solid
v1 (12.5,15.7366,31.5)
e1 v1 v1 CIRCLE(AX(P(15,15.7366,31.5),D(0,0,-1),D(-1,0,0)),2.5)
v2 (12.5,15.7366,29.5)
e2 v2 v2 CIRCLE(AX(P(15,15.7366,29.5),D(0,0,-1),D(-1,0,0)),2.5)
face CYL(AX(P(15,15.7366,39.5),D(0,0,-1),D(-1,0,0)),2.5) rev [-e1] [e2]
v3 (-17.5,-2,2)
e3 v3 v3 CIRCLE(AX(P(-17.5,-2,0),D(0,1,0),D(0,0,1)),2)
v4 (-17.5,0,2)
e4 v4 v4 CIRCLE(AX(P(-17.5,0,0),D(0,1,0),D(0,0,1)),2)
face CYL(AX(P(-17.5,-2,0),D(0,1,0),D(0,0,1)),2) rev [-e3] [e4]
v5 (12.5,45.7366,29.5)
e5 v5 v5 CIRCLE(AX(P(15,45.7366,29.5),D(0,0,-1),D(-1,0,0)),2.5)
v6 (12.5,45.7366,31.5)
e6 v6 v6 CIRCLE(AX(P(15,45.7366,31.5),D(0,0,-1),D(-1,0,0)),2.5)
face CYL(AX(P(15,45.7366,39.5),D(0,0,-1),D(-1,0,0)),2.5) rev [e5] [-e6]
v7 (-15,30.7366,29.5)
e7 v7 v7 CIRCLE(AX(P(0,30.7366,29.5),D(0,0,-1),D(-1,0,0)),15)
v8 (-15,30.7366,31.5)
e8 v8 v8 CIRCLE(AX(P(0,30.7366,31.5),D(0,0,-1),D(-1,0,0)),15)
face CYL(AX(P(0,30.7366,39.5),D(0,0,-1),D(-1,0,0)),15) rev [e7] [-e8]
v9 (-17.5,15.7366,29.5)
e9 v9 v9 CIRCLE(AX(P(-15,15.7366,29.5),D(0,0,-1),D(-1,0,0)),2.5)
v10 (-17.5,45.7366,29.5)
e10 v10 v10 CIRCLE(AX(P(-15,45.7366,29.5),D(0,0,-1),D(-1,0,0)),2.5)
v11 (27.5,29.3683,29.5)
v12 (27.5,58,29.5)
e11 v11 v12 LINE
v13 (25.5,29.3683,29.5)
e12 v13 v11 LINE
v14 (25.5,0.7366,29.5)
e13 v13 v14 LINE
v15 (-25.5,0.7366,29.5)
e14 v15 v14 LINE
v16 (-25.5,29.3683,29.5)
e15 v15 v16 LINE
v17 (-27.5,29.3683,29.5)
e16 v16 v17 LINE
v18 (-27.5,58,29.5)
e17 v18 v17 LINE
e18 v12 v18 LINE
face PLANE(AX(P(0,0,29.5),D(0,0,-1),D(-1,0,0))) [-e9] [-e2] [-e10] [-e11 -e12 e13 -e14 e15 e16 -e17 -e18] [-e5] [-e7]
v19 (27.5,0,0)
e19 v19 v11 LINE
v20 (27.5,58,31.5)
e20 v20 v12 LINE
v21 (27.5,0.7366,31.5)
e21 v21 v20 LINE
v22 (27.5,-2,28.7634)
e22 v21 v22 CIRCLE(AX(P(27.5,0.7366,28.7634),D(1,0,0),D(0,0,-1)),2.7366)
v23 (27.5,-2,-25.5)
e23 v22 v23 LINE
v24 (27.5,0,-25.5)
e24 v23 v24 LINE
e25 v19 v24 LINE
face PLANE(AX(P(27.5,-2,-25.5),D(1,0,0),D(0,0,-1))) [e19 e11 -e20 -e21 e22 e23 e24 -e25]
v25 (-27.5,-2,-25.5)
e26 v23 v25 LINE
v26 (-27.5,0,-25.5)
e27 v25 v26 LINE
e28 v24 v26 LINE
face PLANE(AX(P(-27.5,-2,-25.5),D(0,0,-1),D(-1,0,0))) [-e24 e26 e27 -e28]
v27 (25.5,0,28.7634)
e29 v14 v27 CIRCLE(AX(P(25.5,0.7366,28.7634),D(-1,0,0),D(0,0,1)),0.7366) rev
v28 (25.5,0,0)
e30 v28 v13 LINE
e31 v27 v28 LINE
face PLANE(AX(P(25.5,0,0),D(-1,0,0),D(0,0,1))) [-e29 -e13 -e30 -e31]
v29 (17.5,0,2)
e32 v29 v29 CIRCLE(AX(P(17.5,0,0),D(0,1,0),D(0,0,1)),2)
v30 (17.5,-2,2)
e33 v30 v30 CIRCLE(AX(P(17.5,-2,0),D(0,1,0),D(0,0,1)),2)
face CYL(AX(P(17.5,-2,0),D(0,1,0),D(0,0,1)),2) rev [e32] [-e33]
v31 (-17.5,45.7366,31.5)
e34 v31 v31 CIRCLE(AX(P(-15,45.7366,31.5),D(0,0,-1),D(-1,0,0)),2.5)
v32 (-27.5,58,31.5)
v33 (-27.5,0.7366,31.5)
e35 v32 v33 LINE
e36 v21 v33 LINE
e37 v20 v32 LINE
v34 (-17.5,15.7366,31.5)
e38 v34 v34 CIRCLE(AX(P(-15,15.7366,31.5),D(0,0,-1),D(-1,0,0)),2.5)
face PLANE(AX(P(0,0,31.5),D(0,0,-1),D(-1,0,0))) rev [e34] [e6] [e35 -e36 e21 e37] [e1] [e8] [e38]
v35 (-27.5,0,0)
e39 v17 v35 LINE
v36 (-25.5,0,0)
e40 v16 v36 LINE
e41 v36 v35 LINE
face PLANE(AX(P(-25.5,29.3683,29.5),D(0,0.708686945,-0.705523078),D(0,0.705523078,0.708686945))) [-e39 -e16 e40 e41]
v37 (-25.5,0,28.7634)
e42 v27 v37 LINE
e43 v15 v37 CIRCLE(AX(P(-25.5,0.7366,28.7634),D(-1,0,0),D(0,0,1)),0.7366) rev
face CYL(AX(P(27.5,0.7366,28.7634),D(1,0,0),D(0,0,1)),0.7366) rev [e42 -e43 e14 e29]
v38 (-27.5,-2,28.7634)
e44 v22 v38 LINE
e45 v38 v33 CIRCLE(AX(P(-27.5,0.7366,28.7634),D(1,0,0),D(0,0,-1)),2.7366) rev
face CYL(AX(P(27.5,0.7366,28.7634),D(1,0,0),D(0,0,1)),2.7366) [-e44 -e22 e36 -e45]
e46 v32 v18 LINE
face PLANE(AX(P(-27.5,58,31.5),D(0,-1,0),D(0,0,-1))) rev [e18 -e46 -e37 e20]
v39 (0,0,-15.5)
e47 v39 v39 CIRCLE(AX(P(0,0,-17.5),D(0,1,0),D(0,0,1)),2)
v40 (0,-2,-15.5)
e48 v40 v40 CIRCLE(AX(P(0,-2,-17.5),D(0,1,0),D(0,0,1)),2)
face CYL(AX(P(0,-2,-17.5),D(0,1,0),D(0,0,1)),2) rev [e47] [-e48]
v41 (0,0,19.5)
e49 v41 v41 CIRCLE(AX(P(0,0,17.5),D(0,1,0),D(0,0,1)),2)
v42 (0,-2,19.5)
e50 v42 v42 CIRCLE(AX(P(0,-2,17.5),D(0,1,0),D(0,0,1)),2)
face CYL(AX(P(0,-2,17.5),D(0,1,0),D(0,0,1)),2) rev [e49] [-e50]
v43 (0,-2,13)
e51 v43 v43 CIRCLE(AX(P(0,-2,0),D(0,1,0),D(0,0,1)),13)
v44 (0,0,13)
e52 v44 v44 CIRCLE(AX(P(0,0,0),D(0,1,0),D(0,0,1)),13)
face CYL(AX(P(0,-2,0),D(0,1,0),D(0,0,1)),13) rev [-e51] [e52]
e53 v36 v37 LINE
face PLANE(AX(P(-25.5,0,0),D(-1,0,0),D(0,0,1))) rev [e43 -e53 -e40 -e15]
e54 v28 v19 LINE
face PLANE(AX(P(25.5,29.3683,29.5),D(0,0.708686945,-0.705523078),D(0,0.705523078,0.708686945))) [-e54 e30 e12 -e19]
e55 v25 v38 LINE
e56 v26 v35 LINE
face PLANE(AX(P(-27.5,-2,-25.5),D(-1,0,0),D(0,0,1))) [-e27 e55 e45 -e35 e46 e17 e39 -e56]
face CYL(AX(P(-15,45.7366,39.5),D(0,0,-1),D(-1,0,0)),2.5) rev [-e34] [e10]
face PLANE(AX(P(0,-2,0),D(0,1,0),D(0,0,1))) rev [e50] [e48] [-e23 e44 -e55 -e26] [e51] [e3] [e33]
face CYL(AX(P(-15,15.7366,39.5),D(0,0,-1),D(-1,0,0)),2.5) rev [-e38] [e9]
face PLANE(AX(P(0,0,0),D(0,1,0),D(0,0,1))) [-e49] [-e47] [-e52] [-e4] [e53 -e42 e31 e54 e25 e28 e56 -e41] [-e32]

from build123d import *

# Parameters (mm, degrees)
SKETCH_1_W                       = 55
SKETCH_1_H                       = 55
SKETCH_1_R                       = 13
SKETCH_1_R_2                     = 2
SM_BASE_FLANGE_1_DEPTH           = 2
SM_EDGE_FLANGE_1_STRIP_W         = 9.4732
SM_EDGE_FLANGE_1_STRIP_H         = 2
SM_EDGE_FLANGE_1_STRIP_CUT_DEPTH = 55
SM_EDGE_FLANGE_1_DEPTH           = 55
SKETCH_9_R                       = 15
SKETCH_9_R_2                     = 2.5
CUT_EXTRUDE_1_DEPTH              = 10
EXTRUDE_1_DEPTH                  = 2
EXTRUDE_2_DEPTH                  = 2


# Sheet-metal steps are written as plain solids
with BuildPart() as part:
    # Sketch 1 → 基体-法兰1 (new body)
    with BuildSketch(Plane(origin=(0, 0, 0), x_dir=(1, 0, 0), z_dir=(0, 1, 0))):
        with Locations((0, -2)):
            Rectangle(SKETCH_1_W, SKETCH_1_H)
        with Locations(Location((0, 0, 0), (0, 0, 270))):
            Circle(SKETCH_1_R, mode=Mode.SUBTRACT)
        with Locations(Location((17.5, 0, 0), (0, 0, 270))):
            Circle(SKETCH_1_R_2, mode=Mode.SUBTRACT)
        with Locations(Location((-17.5, 0, 0), (0, 0, 270))):
            Circle(SKETCH_1_R_2, mode=Mode.SUBTRACT)
        with Locations(Location((0, 17.5, 0), (0, 0, 270))):
            Circle(SKETCH_1_R_2, mode=Mode.SUBTRACT)
        with Locations(Location((0, -17.5, 0), (0, 0, 270))):
            Circle(SKETCH_1_R_2, mode=Mode.SUBTRACT)
    extrude(amount=-SM_BASE_FLANGE_1_DEPTH)

    # 边线-法兰1 strip (across the edge) → 边线-法兰1 strip cut (cut)
    with BuildSketch(Plane(origin=(-27.5, 0, 29.5), x_dir=(0, 0, -1), z_dir=(1, 0, 0))):
        with Locations((-4, -1)):
            Rectangle(SM_EDGE_FLANGE_1_STRIP_W, SM_EDGE_FLANGE_1_STRIP_H)
    extrude(amount=SM_EDGE_FLANGE_1_STRIP_CUT_DEPTH, mode=Mode.SUBTRACT)

    # 边线-法兰1 section (across the edge) → 边线-法兰1 (add)
    with BuildSketch(Plane(origin=(-27.5, 0, 29.5), x_dir=(0, 0, -1), z_dir=(1, 0, 0))):
        with BuildLine():
            Line((-2, 0.7366), (-2, 58))
            Line((-2, 58), (0, 58))
            Line((0, 58), (0, 0.7366))
            ThreePointArc((0, 0.7366), (0.215745145, 0.215745145), (0.7366, 0))
            Line((0.7366, 0), (0.7366, -2))
            ThreePointArc((0.7366, -2), (-1.198468417, -1.198468417), (-2, 0.7366))
        make_face()
    extrude(amount=SM_EDGE_FLANGE_1_DEPTH)

    # 草图9 → 切除-拉伸1 (cut)
    with BuildSketch(Plane(origin=(0, 0, 29.5), x_dir=(-1, 0, 0), z_dir=(0, 0, -1))):
        with Locations((0, 30.7366)):
            Circle(SKETCH_9_R)
        with Locations((-15, 45.7366)):
            Circle(SKETCH_9_R_2)
        with Locations((-15, 15.7366)):
            Circle(SKETCH_9_R_2)
        with Locations((15, 15.7366)):
            Circle(SKETCH_9_R_2)
        with Locations((15, 45.7366)):
            Circle(SKETCH_9_R_2)
    extrude(amount=-CUT_EXTRUDE_1_DEPTH, mode=Mode.SUBTRACT)

    # 草图10 → 凸台-拉伸1 (add)
    with BuildSketch(Plane(origin=(27.5, 0, 0), x_dir=(0, 0, -1), z_dir=(1, 0, 0))):
        Polygon((-29.5, 29.3683), (0, 0), (-29.5, 0), align=None)
    extrude(amount=-EXTRUDE_1_DEPTH)

    # 草图11 → 凸台-拉伸2 (add)
    with BuildSketch(Plane.ZY.offset(27.5)):
        Polygon((29.5, 29.3683), (0, 0), (29.5, 0), align=None)
    extrude(amount=-EXTRUDE_2_DEPTH)


solid = part.part
